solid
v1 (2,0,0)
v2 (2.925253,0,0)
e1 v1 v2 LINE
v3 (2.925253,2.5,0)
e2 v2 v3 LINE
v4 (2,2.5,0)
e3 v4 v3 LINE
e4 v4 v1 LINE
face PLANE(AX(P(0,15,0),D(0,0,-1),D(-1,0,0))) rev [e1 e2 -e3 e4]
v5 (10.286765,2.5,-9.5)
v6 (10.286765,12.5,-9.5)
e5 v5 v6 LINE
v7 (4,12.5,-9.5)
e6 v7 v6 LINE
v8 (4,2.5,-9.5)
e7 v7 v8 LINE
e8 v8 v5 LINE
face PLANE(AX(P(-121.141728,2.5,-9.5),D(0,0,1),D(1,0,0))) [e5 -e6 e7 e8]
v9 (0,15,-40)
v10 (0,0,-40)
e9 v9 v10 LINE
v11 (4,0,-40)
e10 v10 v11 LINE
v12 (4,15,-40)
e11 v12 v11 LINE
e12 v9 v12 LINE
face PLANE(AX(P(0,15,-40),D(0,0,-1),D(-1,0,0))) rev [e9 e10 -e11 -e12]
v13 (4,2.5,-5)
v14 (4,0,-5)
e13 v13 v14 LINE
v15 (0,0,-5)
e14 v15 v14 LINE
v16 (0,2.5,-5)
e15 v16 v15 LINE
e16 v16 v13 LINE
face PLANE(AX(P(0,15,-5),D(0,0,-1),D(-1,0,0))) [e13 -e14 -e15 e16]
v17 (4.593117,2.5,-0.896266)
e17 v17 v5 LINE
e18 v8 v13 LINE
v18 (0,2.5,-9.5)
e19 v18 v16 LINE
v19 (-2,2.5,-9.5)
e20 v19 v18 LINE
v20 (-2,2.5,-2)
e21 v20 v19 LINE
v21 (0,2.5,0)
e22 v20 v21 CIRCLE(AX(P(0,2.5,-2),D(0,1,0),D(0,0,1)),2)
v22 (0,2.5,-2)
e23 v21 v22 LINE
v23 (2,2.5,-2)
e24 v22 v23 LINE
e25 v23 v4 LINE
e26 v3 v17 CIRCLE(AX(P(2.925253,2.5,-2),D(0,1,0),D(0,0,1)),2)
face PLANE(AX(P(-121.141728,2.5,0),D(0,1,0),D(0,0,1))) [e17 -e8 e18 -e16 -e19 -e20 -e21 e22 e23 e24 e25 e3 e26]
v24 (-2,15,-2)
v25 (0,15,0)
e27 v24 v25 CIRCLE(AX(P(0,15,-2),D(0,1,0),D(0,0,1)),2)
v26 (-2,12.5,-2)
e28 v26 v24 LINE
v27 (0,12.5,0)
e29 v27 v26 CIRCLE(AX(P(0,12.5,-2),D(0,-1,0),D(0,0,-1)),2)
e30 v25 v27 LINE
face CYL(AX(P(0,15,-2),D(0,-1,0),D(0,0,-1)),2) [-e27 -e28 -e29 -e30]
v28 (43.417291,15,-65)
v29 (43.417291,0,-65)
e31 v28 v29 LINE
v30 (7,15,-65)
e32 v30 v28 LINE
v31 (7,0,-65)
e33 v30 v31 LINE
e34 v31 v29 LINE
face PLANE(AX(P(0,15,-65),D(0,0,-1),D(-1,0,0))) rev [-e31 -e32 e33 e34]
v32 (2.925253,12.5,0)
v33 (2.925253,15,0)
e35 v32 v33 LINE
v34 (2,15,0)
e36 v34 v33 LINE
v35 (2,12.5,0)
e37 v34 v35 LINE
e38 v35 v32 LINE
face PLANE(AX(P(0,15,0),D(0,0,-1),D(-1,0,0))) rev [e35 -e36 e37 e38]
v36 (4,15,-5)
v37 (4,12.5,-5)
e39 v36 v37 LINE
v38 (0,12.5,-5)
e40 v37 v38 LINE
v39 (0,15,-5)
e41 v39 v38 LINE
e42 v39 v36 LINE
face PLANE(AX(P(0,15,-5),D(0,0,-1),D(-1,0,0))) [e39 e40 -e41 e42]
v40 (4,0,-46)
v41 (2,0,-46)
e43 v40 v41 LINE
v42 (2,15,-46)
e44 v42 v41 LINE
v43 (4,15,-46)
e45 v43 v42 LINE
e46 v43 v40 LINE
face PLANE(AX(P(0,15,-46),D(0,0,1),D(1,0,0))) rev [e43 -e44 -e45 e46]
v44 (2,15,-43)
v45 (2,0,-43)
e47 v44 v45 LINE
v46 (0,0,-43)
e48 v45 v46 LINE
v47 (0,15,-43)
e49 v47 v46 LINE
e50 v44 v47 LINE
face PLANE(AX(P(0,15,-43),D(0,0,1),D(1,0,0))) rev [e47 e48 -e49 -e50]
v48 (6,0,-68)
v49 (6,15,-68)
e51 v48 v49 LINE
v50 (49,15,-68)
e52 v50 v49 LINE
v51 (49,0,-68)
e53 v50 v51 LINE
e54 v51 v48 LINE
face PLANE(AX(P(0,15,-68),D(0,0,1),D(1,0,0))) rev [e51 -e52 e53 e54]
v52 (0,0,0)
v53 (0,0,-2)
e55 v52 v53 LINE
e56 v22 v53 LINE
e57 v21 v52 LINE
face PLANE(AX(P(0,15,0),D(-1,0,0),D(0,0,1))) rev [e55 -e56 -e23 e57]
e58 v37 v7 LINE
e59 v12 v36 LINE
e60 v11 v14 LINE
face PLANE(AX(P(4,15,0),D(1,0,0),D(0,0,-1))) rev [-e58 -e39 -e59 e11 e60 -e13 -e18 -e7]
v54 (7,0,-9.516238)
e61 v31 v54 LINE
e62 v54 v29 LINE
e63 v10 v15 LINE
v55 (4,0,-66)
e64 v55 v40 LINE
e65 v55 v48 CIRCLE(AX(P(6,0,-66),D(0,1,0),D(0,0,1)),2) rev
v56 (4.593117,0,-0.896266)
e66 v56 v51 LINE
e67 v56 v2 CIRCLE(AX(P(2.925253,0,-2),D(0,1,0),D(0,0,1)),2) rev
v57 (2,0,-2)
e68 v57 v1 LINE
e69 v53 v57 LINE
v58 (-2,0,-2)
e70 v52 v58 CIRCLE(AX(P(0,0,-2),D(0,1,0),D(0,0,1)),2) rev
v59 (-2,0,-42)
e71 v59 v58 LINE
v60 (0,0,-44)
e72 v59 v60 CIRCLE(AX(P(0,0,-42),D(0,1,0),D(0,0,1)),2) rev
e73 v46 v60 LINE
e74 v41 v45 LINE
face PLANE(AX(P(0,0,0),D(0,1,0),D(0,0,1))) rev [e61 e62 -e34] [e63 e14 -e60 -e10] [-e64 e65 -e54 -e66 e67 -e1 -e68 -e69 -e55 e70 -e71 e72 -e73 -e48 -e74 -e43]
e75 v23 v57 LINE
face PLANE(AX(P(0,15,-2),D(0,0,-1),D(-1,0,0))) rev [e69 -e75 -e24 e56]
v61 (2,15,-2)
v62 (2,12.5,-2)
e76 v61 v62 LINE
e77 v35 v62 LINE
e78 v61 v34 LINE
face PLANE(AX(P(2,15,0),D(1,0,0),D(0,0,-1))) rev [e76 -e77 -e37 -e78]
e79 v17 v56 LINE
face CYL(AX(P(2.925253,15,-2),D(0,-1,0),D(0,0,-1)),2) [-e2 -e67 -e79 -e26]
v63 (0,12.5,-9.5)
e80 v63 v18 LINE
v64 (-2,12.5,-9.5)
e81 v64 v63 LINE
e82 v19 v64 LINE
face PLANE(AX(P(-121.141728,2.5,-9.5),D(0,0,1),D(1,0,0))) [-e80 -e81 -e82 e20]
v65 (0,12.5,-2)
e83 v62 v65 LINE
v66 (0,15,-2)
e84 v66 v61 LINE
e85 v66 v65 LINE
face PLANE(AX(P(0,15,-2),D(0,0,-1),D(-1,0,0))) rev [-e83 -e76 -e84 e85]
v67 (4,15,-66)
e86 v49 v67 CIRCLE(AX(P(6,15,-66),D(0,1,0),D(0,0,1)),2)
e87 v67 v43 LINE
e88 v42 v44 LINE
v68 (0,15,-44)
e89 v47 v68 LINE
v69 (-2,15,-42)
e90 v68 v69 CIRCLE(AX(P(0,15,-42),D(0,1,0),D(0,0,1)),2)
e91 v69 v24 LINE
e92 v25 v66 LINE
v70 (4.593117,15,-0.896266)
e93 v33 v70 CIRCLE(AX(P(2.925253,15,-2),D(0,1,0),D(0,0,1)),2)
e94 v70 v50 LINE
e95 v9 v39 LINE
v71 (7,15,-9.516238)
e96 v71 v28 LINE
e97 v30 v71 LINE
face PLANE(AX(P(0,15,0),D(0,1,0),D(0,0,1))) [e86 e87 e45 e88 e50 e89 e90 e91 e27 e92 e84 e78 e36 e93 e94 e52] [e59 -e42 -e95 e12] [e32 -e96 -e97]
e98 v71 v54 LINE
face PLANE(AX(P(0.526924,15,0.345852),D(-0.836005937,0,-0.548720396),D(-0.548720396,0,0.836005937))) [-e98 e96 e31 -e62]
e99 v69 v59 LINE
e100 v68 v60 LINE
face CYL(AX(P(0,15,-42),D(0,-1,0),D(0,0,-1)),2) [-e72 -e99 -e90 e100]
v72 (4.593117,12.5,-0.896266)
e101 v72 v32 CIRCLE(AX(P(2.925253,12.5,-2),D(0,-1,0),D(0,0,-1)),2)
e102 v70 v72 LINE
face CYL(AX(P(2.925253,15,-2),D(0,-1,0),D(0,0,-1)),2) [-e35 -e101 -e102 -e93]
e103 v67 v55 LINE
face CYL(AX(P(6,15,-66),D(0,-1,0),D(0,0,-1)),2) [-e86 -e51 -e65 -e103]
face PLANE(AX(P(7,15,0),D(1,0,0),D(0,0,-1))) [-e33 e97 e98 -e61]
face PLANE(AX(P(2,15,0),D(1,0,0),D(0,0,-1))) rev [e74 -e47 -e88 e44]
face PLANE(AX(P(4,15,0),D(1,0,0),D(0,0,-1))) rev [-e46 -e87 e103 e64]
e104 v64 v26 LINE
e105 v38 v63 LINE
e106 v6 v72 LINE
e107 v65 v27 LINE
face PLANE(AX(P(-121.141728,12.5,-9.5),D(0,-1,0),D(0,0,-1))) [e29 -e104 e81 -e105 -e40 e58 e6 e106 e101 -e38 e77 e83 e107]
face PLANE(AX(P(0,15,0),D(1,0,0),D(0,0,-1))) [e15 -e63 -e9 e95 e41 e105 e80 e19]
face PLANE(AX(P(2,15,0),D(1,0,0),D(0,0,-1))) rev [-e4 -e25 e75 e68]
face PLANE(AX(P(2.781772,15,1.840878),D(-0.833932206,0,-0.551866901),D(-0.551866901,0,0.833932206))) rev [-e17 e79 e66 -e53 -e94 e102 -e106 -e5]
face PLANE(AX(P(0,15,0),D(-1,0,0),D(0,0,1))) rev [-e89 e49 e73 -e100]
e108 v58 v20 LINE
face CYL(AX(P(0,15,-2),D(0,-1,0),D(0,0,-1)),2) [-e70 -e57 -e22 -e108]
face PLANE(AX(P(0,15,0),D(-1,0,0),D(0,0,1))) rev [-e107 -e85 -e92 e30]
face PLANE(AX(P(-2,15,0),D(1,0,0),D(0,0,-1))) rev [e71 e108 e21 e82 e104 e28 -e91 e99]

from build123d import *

# Parameters (mm, degrees)
SKETCH2_W               = 4
SKETCH2_H               = 35
BOSS_EXTRUDE1_DEPTH     = 15
CUT_EXTRUDE1_DEPTH      = 87.313382508
CUT_EXTRUDE1_DEPTH_BACK = 15
SKETCH3_W               = 9.5
SKETCH3_H               = 10
FILLET1_R               = 2
FILLET2_R               = 2
FILLET3_R               = 2
FILLET4_R               = 2
FILLET5_R               = 2
FILLET6_R               = 2


with BuildPart() as part:
    # Sketch2 → Boss-Extrude1 (new body)
    with BuildSketch(Plane(origin=(0, 0, 0), x_dir=(1, 0, 0), z_dir=(0, 1, 0))):
        Polygon((0, 0), (0, 2), (2, 2), (2, 0), (4, 0), (49, 68), (4, 68), (4, 46), (2, 46), (2, 43), (0, 43), (0, 44), (-2, 44), (-2, 0), align=None)
        with Locations((2, 22.5)):
            Rectangle(SKETCH2_W, SKETCH2_H, mode=Mode.SUBTRACT)
        Polygon((7, 65), (43.417291153, 65), (7, 9.516238481), align=None, mode=Mode.SUBTRACT)
    extrude(amount=BOSS_EXTRUDE1_DEPTH)

    # Sketch3 → Cut-Extrude1 (cut, two sides: drawn at the far end of the back side and taken through both)
    with BuildSketch(Plane.ZY.offset(2).offset(-CUT_EXTRUDE1_DEPTH_BACK)):
        with Locations((-4.75, 7.5)):
            Rectangle(SKETCH3_W, SKETCH3_H)
    extrude(amount=CUT_EXTRUDE1_DEPTH + CUT_EXTRUDE1_DEPTH_BACK, mode=Mode.SUBTRACT)

    # Fillet1
    fillet1_edges = [part.edges().sort_by_distance(p)[0] for p in [
        (-2, 7.5, -44),
    ]]
    fillet(fillet1_edges, radius=FILLET1_R - 0.0001)  # a hair under: the kernel refuses the full size

    # Fillet2
    fillet2_edges = [part.edges().sort_by_distance(p)[0] for p in [
        (4, 7.5, -68),
    ]]
    fillet(fillet2_edges, radius=FILLET2_R)

    # Fillet3
    fillet3_edges = [part.edges().sort_by_distance(p)[0] for p in [
        (4, 1.25, 0),
    ]]
    fillet(fillet3_edges, radius=FILLET3_R)

    # Fillet4
    fillet4_edges = [part.edges().sort_by_distance(p)[0] for p in [
        (4, 13.75, 0),
    ]]
    fillet(fillet4_edges, radius=FILLET4_R)

    # Fillet5
    fillet5_edges = [part.edges().sort_by_distance(p)[0] for p in [
        (-2, 13.75, 0),
    ]]
    fillet(fillet5_edges, radius=FILLET5_R - 0.0001)  # a hair under: the kernel refuses the full size

    # Fillet6
    fillet6_edges = [part.edges().sort_by_distance(p)[0] for p in [
        (-2, 1.25, 0),
    ]]
    fillet(fillet6_edges, radius=FILLET6_R - 0.0001)  # a hair under: the kernel refuses the full size


solid = part.part
